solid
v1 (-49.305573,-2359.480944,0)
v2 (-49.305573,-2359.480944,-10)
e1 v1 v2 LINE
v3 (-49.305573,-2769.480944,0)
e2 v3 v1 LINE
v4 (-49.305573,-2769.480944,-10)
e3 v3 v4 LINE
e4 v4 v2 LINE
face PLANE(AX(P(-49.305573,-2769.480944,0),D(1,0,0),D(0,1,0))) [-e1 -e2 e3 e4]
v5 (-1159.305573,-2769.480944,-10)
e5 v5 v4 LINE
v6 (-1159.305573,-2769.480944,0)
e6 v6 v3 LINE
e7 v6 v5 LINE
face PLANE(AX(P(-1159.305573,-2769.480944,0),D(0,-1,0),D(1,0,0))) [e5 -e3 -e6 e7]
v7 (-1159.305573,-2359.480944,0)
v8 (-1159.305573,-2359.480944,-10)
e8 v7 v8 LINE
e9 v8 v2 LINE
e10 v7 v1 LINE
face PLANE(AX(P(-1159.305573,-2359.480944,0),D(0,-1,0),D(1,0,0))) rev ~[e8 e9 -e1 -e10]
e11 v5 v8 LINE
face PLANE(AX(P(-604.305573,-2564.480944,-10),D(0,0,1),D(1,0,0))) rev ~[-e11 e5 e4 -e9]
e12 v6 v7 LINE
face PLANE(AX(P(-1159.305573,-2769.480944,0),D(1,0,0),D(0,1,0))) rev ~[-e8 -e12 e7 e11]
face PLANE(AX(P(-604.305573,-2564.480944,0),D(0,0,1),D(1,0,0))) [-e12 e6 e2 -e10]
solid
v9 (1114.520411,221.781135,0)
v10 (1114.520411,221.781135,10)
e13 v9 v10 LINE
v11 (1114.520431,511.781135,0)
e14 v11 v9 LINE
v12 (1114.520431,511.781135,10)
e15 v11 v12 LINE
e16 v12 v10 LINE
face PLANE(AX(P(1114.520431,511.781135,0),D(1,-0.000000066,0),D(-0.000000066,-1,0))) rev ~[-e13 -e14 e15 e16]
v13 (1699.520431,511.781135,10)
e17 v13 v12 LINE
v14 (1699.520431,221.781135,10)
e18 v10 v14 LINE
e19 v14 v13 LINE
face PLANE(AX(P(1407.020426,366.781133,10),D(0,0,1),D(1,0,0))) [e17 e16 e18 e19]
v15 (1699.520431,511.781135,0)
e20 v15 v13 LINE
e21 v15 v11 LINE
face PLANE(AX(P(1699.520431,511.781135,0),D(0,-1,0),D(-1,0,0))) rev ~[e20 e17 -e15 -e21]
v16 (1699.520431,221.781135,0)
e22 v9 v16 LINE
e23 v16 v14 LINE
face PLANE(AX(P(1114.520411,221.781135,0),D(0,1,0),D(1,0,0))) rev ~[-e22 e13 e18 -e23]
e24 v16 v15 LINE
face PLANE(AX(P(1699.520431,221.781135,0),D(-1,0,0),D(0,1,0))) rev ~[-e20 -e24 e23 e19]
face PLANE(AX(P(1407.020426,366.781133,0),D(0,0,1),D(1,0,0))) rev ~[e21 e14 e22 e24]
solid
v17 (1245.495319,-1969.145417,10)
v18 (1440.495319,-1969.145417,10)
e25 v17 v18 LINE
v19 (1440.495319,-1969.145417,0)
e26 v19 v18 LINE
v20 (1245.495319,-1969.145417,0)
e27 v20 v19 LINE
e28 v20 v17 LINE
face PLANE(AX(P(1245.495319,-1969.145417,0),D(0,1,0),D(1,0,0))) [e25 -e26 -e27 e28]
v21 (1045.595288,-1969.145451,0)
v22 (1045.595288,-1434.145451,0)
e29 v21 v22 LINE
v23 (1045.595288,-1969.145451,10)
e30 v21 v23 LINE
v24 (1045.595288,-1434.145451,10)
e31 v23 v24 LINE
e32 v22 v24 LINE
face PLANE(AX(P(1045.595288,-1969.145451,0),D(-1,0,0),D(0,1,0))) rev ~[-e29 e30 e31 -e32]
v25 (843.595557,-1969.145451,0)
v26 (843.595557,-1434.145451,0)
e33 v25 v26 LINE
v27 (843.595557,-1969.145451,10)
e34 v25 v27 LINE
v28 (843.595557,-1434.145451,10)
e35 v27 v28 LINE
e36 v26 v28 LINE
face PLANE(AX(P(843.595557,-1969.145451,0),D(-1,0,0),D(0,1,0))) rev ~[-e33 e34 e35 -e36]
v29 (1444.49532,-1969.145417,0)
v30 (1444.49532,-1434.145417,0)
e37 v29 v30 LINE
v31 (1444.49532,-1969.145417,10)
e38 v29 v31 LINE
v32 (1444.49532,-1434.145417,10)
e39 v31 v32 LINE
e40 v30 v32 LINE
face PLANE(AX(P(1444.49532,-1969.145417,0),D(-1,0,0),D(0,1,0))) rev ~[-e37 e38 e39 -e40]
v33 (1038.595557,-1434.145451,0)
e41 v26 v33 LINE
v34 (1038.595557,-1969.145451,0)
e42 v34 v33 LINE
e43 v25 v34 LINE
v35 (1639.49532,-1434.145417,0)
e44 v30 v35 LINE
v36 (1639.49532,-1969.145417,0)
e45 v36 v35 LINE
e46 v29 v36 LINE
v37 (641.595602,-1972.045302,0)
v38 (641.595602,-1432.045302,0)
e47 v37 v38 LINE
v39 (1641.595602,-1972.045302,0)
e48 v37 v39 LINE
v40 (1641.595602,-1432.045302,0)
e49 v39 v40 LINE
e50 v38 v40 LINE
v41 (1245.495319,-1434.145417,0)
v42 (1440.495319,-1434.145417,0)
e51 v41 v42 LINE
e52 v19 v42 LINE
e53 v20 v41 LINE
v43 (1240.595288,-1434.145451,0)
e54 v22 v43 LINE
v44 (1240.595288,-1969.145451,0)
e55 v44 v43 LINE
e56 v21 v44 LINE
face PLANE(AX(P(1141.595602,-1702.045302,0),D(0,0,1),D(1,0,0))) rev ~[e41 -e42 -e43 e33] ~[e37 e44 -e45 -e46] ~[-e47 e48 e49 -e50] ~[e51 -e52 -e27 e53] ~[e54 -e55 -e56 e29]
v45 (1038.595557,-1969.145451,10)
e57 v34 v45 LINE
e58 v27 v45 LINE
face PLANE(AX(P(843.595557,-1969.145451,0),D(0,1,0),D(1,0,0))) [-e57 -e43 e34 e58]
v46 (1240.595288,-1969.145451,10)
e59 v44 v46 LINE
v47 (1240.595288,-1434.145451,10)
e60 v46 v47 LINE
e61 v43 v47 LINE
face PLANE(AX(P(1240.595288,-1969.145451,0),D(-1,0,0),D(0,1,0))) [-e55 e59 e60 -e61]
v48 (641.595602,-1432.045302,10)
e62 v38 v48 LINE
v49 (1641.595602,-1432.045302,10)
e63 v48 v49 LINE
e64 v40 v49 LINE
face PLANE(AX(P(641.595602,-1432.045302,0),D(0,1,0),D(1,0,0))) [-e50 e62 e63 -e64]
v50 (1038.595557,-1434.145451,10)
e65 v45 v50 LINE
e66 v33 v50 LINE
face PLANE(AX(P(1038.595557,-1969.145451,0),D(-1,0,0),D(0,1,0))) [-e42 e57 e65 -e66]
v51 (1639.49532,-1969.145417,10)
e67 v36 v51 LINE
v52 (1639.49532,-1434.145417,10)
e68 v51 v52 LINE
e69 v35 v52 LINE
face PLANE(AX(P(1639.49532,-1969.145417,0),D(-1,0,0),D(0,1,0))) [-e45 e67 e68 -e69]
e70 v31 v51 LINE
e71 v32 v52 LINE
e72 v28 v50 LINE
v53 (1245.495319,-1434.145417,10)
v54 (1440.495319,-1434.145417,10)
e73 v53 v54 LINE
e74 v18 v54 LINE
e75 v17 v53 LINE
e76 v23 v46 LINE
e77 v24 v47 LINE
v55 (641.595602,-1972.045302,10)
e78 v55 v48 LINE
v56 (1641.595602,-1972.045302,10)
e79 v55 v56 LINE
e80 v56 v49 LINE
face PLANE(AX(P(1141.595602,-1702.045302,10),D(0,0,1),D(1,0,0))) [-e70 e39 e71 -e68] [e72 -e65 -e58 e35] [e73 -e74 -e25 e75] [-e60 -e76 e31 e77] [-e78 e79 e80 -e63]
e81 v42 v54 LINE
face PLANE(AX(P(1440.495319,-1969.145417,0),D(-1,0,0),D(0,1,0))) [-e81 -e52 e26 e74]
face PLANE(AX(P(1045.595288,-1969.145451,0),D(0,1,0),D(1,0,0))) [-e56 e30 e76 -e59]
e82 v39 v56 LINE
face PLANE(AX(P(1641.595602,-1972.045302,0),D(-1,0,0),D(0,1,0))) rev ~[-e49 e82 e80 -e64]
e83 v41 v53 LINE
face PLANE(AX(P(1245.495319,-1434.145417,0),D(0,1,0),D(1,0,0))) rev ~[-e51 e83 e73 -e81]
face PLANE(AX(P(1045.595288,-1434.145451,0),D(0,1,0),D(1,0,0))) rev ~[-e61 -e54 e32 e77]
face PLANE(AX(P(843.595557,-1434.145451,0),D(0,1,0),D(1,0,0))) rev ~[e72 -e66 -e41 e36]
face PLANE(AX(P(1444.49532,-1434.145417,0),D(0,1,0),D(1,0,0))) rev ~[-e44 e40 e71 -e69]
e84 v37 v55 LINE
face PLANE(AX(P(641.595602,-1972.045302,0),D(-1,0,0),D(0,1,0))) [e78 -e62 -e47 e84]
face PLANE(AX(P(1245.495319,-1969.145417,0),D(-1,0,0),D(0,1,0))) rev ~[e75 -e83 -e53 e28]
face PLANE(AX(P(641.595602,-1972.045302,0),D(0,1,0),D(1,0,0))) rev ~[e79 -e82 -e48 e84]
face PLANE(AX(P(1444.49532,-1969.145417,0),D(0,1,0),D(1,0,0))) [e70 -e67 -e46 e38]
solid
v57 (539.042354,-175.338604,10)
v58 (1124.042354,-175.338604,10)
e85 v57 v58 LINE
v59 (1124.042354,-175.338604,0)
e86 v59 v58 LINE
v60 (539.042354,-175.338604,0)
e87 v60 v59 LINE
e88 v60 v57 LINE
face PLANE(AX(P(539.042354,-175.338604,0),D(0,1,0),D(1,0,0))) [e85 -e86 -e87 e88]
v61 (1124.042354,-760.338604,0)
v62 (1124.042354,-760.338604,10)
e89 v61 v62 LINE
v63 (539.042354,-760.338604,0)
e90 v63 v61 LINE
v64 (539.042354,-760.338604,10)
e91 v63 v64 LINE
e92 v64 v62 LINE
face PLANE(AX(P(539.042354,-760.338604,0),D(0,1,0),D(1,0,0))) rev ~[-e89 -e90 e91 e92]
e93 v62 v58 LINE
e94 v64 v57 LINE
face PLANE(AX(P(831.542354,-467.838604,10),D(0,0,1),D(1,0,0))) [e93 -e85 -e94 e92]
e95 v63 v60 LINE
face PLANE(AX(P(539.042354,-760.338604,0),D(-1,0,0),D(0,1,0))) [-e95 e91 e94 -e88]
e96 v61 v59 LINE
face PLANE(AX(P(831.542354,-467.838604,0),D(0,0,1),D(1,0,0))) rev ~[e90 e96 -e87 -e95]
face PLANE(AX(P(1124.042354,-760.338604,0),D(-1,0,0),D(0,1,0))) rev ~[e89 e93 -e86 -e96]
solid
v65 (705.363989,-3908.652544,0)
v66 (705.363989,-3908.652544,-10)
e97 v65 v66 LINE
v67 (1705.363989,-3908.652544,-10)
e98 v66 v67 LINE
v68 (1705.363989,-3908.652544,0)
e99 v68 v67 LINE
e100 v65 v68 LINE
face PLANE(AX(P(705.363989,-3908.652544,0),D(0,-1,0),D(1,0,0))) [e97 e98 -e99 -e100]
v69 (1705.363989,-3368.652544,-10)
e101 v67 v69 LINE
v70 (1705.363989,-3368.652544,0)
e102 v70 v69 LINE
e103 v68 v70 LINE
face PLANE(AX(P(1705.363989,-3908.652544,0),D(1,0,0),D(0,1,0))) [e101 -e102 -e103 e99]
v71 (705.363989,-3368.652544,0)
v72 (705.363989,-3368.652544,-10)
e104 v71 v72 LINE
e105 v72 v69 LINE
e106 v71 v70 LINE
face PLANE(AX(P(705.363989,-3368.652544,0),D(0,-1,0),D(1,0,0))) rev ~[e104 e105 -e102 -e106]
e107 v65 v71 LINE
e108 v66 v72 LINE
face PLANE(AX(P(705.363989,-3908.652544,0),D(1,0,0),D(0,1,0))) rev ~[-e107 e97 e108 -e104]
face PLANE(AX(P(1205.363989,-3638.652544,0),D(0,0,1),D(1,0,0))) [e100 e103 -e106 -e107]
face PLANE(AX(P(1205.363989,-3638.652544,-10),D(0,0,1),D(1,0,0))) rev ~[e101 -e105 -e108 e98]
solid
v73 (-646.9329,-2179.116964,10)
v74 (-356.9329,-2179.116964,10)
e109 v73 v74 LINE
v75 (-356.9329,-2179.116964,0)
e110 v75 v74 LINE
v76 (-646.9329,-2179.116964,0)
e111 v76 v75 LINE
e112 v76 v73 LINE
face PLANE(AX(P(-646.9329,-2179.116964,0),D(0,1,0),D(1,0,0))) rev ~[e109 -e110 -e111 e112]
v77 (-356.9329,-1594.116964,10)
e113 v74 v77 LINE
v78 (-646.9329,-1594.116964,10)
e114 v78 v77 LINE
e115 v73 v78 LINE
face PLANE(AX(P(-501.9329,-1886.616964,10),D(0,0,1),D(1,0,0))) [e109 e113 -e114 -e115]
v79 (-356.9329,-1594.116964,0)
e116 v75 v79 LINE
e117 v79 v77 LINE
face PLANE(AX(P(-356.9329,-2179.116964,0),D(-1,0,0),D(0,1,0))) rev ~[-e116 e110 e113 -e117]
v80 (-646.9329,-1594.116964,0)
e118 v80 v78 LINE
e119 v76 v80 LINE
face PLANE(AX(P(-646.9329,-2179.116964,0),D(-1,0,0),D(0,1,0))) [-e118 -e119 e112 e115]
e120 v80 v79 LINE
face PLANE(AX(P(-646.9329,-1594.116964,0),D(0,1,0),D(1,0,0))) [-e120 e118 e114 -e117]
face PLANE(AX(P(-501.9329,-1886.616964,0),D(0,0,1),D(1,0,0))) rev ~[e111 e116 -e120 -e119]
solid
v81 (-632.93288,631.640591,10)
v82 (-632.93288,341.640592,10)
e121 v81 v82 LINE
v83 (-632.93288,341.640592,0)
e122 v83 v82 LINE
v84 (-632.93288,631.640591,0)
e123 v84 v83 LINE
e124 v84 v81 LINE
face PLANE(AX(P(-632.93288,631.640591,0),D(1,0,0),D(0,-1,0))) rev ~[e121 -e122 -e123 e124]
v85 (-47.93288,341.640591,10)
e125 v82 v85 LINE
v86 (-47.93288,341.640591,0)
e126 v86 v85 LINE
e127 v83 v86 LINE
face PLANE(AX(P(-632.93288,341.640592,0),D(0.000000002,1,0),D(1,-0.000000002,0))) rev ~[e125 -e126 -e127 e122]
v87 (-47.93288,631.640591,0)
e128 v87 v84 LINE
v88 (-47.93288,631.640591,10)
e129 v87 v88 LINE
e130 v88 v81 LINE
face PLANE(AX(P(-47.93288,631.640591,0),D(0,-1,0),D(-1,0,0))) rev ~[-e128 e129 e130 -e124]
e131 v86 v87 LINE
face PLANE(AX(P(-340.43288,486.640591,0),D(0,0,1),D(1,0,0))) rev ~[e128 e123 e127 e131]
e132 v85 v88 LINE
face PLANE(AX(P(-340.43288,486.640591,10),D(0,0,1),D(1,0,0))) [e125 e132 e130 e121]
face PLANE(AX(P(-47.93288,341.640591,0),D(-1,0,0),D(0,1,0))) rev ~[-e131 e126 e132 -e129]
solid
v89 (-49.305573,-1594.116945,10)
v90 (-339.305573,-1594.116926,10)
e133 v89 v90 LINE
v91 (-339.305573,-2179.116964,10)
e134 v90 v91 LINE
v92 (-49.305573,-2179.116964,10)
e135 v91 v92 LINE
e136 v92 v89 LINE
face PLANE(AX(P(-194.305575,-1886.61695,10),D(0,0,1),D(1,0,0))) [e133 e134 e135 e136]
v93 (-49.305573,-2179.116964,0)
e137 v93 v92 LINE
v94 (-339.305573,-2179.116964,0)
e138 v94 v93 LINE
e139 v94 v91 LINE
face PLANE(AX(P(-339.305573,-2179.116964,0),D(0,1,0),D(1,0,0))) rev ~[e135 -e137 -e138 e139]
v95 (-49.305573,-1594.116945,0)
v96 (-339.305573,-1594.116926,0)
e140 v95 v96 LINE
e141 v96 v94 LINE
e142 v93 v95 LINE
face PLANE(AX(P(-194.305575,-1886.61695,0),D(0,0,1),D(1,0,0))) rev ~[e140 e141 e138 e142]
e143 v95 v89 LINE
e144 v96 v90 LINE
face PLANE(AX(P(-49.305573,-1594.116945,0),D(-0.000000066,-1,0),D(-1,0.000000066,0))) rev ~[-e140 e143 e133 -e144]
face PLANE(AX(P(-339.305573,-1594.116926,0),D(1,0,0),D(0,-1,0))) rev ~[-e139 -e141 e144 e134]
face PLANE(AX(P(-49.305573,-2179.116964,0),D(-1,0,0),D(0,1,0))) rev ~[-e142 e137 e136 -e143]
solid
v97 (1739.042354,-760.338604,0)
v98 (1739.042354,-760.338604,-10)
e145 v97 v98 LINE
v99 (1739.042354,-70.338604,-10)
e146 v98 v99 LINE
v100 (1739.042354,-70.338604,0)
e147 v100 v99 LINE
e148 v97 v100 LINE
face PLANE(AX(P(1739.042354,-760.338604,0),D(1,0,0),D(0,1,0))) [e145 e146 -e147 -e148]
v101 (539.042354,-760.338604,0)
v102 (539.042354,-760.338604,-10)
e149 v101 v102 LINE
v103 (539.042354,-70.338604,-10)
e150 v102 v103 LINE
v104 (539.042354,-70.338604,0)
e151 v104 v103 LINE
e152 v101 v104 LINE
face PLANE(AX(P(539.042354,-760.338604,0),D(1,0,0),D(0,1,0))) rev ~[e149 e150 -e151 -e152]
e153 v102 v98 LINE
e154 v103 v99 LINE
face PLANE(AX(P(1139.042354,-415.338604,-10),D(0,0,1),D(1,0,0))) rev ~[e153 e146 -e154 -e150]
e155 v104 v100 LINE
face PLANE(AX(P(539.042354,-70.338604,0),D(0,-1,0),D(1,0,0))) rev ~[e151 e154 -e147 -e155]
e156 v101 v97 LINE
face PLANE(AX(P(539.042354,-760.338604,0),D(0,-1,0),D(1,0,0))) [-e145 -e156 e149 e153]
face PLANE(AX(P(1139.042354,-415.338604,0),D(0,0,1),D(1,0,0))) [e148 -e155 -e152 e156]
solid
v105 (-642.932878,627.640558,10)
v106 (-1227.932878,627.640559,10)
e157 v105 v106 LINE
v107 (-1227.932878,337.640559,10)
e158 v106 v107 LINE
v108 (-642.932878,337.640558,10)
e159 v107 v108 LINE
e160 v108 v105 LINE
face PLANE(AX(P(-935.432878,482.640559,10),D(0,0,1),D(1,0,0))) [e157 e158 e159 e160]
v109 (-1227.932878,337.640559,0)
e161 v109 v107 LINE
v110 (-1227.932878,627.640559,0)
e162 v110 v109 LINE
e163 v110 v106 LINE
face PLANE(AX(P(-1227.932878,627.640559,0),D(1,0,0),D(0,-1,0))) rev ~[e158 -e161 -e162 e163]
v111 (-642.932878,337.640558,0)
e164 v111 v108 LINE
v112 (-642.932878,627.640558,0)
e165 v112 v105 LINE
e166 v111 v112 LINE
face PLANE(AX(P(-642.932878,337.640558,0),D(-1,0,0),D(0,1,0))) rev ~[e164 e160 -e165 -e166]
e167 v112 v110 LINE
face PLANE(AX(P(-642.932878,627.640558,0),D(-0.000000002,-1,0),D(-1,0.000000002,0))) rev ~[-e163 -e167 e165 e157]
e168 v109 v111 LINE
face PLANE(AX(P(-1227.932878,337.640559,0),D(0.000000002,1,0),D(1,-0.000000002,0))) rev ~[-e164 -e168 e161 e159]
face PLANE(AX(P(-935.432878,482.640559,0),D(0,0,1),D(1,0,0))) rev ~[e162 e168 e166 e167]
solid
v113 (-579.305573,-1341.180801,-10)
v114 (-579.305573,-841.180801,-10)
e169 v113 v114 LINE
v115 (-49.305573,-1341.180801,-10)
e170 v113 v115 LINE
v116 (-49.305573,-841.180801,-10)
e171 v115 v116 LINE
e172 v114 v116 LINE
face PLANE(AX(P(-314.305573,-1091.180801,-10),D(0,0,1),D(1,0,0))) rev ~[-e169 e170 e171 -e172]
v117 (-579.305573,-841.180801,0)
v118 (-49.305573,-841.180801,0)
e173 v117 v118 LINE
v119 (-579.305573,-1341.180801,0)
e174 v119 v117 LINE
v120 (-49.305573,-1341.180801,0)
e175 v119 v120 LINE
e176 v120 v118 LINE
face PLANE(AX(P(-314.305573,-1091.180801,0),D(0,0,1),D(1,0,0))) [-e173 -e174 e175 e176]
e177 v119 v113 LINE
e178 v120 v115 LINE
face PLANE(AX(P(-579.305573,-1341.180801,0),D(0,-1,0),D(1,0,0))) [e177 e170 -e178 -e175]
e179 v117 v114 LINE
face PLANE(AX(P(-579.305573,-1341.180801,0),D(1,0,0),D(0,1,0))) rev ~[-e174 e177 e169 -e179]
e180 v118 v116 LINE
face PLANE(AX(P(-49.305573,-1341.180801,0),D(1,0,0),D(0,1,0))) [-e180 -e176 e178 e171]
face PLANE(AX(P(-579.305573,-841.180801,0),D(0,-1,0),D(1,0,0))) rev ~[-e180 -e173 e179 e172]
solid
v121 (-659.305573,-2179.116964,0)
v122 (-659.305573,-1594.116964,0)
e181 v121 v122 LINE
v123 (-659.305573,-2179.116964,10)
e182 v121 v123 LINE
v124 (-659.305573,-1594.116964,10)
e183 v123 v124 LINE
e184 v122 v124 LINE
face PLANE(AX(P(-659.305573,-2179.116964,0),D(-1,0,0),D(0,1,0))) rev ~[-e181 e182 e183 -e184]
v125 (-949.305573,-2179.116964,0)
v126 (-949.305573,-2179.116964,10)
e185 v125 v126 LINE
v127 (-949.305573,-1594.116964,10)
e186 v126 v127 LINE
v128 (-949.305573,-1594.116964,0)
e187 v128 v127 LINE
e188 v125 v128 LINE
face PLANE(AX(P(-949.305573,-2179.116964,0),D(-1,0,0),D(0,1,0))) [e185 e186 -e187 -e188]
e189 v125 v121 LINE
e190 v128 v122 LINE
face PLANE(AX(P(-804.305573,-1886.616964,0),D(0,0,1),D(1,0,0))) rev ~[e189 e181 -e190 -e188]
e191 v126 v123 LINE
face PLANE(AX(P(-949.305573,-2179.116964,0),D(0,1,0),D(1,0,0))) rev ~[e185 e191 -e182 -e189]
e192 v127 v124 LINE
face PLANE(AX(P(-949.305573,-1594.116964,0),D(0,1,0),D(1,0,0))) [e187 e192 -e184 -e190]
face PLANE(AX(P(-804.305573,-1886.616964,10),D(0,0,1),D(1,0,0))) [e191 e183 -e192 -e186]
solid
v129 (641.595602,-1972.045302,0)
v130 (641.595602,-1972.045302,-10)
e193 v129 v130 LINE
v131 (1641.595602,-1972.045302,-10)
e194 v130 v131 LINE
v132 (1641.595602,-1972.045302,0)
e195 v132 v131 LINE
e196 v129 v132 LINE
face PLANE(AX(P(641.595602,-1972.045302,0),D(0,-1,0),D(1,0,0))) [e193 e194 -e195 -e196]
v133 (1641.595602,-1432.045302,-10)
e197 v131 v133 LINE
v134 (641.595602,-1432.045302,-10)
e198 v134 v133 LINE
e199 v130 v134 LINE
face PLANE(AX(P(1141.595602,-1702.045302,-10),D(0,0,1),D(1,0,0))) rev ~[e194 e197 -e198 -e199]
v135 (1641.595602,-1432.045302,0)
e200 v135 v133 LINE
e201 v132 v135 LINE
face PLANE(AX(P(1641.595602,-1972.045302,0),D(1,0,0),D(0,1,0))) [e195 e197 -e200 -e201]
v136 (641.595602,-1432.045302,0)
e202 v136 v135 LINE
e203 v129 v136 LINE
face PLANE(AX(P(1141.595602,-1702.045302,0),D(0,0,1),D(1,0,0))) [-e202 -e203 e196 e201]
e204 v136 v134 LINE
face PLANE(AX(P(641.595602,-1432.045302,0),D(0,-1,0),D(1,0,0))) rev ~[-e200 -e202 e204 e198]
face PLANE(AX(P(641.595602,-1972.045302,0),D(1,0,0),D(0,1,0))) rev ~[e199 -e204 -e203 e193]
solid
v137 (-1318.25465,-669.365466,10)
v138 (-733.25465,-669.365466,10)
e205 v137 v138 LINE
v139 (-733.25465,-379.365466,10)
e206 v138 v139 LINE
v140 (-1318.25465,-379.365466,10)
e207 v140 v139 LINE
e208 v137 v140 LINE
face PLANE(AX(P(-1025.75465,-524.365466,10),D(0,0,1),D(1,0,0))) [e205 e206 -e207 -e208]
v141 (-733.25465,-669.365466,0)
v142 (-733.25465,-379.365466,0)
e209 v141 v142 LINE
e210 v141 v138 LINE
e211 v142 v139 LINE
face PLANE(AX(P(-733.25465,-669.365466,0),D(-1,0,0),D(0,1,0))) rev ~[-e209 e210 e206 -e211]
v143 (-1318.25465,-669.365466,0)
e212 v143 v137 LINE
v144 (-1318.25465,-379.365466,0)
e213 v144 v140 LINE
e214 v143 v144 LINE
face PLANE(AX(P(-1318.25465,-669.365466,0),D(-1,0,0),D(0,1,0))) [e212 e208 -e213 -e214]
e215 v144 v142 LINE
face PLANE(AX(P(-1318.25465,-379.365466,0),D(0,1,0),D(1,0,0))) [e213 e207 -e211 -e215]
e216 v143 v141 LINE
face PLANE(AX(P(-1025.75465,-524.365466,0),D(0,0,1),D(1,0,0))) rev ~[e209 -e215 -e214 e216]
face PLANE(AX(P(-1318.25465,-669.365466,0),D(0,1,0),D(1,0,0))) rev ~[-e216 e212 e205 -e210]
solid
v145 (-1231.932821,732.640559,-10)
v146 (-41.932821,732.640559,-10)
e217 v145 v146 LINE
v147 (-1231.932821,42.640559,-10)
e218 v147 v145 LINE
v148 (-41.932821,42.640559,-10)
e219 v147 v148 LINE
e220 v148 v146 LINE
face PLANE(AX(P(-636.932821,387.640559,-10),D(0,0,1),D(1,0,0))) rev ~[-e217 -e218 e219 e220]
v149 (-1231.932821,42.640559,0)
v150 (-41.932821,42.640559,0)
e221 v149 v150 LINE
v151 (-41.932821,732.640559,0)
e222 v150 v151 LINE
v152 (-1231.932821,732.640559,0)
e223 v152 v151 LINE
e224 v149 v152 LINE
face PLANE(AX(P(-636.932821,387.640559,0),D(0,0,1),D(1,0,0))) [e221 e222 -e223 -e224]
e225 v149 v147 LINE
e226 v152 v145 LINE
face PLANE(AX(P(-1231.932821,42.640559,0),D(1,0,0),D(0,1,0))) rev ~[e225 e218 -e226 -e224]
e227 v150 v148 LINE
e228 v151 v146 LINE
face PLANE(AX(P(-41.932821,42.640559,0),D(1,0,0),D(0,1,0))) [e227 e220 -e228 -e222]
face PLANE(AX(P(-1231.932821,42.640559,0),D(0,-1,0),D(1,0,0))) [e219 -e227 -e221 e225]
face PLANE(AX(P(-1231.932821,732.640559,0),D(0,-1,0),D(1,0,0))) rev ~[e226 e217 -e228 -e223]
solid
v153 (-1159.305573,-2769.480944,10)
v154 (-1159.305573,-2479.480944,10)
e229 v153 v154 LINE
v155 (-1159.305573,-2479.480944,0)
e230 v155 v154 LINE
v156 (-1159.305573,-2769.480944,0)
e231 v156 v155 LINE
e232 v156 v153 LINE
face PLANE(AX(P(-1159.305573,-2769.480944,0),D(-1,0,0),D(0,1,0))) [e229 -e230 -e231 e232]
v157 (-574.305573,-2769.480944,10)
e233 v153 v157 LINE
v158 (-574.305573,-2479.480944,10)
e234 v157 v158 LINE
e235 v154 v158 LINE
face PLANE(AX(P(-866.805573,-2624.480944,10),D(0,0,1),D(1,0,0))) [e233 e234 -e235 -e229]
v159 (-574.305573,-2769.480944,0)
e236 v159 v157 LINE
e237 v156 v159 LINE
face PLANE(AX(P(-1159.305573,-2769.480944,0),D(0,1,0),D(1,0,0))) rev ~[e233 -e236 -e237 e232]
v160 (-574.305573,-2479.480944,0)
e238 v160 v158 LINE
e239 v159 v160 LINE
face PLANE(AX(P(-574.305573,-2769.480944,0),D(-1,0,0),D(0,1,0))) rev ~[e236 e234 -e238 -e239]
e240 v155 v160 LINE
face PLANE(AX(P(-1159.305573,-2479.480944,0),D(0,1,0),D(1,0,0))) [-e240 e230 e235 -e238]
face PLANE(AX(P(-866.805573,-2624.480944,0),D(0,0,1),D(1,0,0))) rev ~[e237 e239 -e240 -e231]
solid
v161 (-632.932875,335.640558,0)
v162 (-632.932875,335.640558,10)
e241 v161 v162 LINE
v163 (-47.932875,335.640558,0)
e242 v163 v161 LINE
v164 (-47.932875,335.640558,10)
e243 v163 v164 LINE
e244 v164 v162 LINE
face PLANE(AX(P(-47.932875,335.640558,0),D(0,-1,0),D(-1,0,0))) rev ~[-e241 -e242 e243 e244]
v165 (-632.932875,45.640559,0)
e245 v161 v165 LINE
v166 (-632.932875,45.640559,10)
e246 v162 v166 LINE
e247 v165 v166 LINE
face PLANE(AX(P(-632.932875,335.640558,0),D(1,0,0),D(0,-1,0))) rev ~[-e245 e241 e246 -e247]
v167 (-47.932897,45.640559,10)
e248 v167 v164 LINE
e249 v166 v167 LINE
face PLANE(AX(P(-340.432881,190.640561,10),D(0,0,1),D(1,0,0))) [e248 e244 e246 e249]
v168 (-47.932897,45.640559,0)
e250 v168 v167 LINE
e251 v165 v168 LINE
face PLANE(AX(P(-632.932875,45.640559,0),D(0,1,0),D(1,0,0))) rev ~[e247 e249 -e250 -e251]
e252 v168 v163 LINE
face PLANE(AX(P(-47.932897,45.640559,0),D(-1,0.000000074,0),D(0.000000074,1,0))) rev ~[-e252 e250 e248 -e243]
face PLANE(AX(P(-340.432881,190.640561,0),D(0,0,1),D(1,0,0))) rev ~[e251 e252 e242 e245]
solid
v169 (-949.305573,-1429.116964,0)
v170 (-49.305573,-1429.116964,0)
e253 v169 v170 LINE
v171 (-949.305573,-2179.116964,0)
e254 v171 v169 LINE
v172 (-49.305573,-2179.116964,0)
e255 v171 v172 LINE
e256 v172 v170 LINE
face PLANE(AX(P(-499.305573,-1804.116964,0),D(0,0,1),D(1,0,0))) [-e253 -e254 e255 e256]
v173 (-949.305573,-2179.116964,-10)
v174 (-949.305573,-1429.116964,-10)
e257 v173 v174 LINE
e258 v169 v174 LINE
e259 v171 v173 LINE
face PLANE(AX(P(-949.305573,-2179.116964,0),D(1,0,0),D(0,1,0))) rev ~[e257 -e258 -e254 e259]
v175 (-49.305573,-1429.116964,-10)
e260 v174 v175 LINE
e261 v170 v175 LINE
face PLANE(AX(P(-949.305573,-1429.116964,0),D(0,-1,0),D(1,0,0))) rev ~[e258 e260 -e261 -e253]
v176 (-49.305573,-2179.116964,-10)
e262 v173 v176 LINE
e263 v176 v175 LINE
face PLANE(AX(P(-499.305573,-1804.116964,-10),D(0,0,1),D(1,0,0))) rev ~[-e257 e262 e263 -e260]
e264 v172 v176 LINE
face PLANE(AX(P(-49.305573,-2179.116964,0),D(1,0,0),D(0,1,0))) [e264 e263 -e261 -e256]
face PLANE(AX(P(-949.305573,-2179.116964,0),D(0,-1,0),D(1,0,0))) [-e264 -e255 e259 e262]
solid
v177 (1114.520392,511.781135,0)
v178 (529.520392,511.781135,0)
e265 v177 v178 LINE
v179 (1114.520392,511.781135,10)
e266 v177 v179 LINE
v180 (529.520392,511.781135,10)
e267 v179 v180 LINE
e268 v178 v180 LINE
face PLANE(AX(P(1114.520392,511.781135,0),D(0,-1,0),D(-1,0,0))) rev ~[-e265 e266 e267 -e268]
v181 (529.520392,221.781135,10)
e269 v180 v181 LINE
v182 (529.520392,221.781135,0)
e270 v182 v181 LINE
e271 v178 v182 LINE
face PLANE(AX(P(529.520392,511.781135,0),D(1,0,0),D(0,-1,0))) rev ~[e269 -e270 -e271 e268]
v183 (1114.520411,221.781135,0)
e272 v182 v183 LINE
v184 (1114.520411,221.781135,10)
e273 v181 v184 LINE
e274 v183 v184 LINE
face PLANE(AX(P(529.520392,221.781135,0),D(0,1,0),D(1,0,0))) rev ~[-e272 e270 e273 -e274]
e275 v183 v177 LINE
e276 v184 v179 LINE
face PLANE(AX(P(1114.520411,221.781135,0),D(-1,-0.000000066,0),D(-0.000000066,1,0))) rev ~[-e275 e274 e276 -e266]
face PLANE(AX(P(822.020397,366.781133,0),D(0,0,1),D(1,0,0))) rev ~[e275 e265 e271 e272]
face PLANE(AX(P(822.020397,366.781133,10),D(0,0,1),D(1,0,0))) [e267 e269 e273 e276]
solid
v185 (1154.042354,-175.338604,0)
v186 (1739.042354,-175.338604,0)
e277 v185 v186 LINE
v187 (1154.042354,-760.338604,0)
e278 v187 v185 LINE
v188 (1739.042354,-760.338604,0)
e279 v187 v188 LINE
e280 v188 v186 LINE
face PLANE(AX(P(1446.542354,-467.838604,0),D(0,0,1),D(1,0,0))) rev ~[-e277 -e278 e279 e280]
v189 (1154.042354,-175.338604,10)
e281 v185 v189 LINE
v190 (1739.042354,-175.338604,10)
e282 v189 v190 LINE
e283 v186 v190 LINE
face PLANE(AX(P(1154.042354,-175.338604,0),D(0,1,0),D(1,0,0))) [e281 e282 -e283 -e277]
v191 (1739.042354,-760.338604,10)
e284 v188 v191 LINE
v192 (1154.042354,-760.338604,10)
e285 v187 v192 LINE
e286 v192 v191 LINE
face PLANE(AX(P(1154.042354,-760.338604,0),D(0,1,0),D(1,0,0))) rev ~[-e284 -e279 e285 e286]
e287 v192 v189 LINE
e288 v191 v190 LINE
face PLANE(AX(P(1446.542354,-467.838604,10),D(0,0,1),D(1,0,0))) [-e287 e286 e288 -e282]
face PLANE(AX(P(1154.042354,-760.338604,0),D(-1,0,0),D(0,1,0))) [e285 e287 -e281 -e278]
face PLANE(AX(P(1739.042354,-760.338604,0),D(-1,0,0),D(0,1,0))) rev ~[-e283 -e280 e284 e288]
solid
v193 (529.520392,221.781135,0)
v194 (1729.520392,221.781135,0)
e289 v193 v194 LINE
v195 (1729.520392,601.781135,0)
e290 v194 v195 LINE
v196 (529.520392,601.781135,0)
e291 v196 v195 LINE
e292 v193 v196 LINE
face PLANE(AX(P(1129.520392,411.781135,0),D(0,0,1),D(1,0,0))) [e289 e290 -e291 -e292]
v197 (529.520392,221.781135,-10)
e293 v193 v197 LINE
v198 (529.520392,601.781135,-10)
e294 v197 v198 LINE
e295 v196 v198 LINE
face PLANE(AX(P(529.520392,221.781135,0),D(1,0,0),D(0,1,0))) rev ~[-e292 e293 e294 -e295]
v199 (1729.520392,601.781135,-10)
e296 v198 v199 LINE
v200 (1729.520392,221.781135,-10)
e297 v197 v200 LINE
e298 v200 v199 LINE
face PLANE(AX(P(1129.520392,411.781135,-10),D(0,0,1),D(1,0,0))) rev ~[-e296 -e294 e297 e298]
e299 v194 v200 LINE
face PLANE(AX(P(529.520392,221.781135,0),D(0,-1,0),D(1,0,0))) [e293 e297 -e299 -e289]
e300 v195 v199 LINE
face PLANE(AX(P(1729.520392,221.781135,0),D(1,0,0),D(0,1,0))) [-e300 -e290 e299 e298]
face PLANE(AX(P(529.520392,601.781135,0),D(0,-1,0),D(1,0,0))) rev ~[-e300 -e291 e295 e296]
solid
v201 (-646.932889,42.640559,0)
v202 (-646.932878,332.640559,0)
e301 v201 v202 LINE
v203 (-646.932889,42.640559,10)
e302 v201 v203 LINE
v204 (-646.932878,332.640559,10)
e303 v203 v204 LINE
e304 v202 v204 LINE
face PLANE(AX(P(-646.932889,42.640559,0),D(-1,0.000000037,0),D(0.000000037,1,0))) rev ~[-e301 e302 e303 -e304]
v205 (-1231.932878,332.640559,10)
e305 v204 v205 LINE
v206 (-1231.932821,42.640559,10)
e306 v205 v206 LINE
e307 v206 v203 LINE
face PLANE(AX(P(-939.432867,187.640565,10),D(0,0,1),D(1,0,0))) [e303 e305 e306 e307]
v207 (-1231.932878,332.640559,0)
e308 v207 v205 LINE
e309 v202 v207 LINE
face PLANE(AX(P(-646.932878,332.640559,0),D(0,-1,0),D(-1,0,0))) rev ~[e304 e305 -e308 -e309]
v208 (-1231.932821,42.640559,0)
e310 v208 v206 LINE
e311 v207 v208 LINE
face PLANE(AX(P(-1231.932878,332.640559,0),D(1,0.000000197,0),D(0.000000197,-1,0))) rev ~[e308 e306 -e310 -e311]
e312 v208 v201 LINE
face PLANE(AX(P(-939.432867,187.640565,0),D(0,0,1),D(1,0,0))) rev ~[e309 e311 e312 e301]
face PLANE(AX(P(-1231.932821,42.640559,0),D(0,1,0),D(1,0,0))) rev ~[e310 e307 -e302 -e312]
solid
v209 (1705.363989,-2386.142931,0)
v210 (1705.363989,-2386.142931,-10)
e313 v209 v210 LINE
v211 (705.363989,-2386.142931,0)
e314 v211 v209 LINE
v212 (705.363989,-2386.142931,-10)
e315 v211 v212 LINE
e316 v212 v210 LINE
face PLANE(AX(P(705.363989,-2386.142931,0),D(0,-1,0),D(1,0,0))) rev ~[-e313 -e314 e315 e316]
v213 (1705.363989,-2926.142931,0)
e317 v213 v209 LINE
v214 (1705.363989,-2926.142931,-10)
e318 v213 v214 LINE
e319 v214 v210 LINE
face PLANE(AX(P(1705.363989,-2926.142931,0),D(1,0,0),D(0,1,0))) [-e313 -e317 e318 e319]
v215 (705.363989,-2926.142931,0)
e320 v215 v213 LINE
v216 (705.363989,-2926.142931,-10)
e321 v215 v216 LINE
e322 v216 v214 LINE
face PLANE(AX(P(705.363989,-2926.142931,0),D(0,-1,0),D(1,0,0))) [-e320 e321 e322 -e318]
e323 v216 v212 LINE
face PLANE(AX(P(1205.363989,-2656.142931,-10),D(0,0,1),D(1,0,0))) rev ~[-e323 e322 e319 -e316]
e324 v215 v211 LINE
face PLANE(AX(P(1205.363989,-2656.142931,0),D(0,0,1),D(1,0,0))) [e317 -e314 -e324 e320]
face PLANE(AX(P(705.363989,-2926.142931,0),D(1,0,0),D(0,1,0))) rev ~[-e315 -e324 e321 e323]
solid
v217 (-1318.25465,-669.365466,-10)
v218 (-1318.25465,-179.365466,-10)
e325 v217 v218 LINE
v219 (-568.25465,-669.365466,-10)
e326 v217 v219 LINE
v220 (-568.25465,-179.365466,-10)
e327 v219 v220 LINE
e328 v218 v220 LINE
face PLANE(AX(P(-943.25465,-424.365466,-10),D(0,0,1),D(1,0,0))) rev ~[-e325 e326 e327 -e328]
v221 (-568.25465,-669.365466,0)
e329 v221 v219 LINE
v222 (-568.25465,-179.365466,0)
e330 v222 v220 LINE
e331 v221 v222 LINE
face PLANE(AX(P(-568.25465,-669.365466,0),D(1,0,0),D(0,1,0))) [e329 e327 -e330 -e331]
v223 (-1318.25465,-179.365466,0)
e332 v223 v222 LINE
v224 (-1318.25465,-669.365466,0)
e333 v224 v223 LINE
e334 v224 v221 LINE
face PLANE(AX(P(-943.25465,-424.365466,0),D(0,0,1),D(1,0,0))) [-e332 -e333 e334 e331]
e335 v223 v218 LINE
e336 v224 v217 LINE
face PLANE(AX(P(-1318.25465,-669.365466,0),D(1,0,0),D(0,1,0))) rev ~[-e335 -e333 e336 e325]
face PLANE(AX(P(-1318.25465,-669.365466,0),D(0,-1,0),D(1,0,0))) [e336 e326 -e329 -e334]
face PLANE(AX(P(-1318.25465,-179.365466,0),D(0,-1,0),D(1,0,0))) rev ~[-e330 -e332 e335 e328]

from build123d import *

# Parameters (mm, degrees)
F0_W     = 1190
F0_H     = 690
F2_DEPTH = 10
F0_W_2   = 750
F0_H_2   = 490
F0_W_3   = 530
F0_H_3   = 500
F0_W_4   = 900
F0_H_4   = 750
F0_W_5   = 1110
F0_H_5   = 410
F0_W_6   = 1200
F0_H_6   = 380
F0_W_7   = 1000
F0_H_7   = 540
F3_DEPTH = 10
F1_W     = 290
F1_H     = 585
F1_W_2   = 585
F1_H_2   = 290
F1_W_3   = 1000
F1_H_3   = 540
F1_W_4   = 195
F1_H_4   = 535


# Not quite as in the source:
# - ends of sketch curves that miss each other by under 0.0002 mm in the source are joined


with BuildPart() as f2:
    # F0 (on Top) → F2 (new body)
    with BuildSketch(Plane.XY):
        with Locations((-636.9328212738, 387.6405593753)):
            Rectangle(F0_W, F0_H)
    extrude(amount=-F2_DEPTH)


with BuildPart() as f2b:
    # F0 (on Top) → F2, piece 2 (new body)
    with BuildSketch(Plane.XY):
        with Locations((-943.2546496391, -424.365465641)):
            Rectangle(F0_W_2, F0_H_2)
    extrude(amount=-F2_DEPTH)


with BuildPart() as f2c:
    # F0 (on Top) → F2, piece 3 (new body)
    with BuildSketch(Plane.XY):
        with Locations((-314.3055731058, -1091.1808013916)):
            Rectangle(F0_W_3, F0_H_3)
    extrude(amount=-F2_DEPTH)


with BuildPart() as f2d:
    # F0 (on Top) → F2, piece 4 (new body)
    with BuildSketch(Plane.XY):
        with Locations((-499.3055731058, -1804.1169643402)):
            Rectangle(F0_W_4, F0_H_4)
    extrude(amount=-F2_DEPTH)


with BuildPart() as f2e:
    # F0 (on Top) → F2, piece 5 (new body)
    with BuildSketch(Plane.XY):
        with Locations((-604.3055731058, -2564.4809436798)):
            Rectangle(F0_W_5, F0_H_5)
    extrude(amount=-F2_DEPTH)


with BuildPart() as f2f:
    # F0 (on Top) → F2, piece 6 (new body)
    with BuildSketch(Plane.XY):
        with Locations((1129.5203924179, 411.7811346054)):
            Rectangle(F0_W_6, F0_H_6)
    extrude(amount=-F2_DEPTH)


with BuildPart() as f2g:
    # F0 (on Top) → F2, piece 7 (new body)
    with BuildSketch(Plane.XY):
        with Locations((1139.0423536301, -415.3386044502)):
            Rectangle(F0_W_6, F0_H)
    extrude(amount=-F2_DEPTH)


with BuildPart() as f2h:
    # F0 (on Top) → F2, piece 8 (new body)
    with BuildSketch(Plane.XY):
        with Locations((1141.5956020355, -1702.0453023911)):
            Rectangle(F0_W_7, F0_H_7)
    extrude(amount=-F2_DEPTH)


with BuildPart() as f2i:
    # F0 (on Top) → F2, piece 9 (new body)
    with BuildSketch(Plane.XY):
        with Locations((1205.3639888763, -2656.1429309845)):
            Rectangle(F0_W_7, F0_H_7)
    extrude(amount=-F2_DEPTH)


with BuildPart() as f2j:
    # F0 (on Top) → F2, piece 10 (new body)
    with BuildSketch(Plane.XY):
        with Locations((1205.3639888763, -3638.6525440216)):
            Rectangle(F0_W_7, F0_H_7)
    extrude(amount=-F2_DEPTH)


with BuildPart() as f3:
    # F1 (on Top) → F3 (new body)
    with BuildSketch(Plane.XY):
        Polygon((-642.9328784943, 337.6405584812), (-642.9328784943, 627.6405584812), (-1227.9328784943, 627.6405593753), (-1227.9328784943, 337.6405593753), align=None)
    extrude(amount=F3_DEPTH)


with BuildPart() as f3b:
    # F1 (on Top) → F3, piece 2 (new body)
    with BuildSketch(Plane.XY):
        Polygon((-47.9328799248, 341.6405907273), (-47.9328799248, 631.6405907273), (-632.9328799248, 631.6405907273), (-632.9328799248, 341.6405916214), align=None)
    extrude(amount=F3_DEPTH)


with BuildPart() as f3c:
    # F1 (on Top) → F3, piece 3 (new body)
    with BuildSketch(Plane.XY):
        Polygon((-646.9328784943, 332.6405593753), (-1231.9328784943, 332.6405593753), (-1231.9328212738, 42.6405593753), (-646.9328892231, 42.6405593753), align=None)
    extrude(amount=F3_DEPTH)


with BuildPart() as f3d:
    # F1 (on Top) → F3, piece 4 (new body)
    with BuildSketch(Plane.XY):
        Polygon((-47.9328751564, 335.6405584812), (-632.9328751564, 335.6405584812), (-632.9328751564, 45.6405593753), (-47.9328966141, 45.6405593753), align=None)
    extrude(amount=F3_DEPTH)


with BuildPart() as f3e:
    # F1 (on Top) → F3, piece 5 (new body)
    with BuildSketch(Plane.XY):
        with Locations((-804.3055731058, -1886.6169643402)):
            Rectangle(F1_W, F1_H)
    extrude(amount=F3_DEPTH)


with BuildPart() as f3f:
    # F1 (on Top) → F3, piece 6 (new body)
    with BuildSketch(Plane.XY):
        with Locations((-501.9328999519, -1886.6169643402)):
            Rectangle(F1_W, F1_H)
    extrude(amount=F3_DEPTH)


with BuildPart() as f3g:
    # F1 (on Top) → F3, piece 7 (new body)
    with BuildSketch(Plane.XY):
        Polygon((-49.3055731058, -2179.1169643402), (-49.3055731058, -1594.1169452667), (-339.3055731058, -1594.1169261932), (-339.3055731058, -2179.1169643402), align=None)
    extrude(amount=F3_DEPTH)


with BuildPart() as f3h:
    # F1 (on Top) → F3, piece 8 (new body)
    with BuildSketch(Plane.XY):
        with Locations((-866.8055731058, -2624.4809436798)):
            Rectangle(F1_W_2, F1_H_2)
    extrude(amount=F3_DEPTH)


with BuildPart() as f3i:
    # F1 (on Top) → F3, piece 9 (new body)
    with BuildSketch(Plane.XY):
        Polygon((1114.5203924179, 511.7811346054), (529.5203924179, 511.7811346054), (529.5203924179, 221.7811346054), (1114.5204114914, 221.7811346054), align=None)
    extrude(amount=F3_DEPTH)


with BuildPart() as f3j:
    # F1 (on Top) → F3, piece 10 (new body)
    with BuildSketch(Plane.XY):
        Polygon((1114.5204114914, 221.7811346054), (1699.5204305649, 221.7811346054), (1699.5204305649, 511.7811346054), (1114.5204305649, 511.7811346054), align=None)
    extrude(amount=F3_DEPTH)


with BuildPart() as f3k:
    # F1 (on Top) → F3, piece 11 (new body)
    with BuildSketch(Plane.XY):
        with Locations((831.5423536301, -467.8386044502)):
            Rectangle(F1_W_2, F1_H)
    extrude(amount=F3_DEPTH)


with BuildPart() as f3l:
    # F1 (on Top) → F3, piece 12 (new body)
    with BuildSketch(Plane.XY):
        with Locations((1446.5423536301, -467.8386044502)):
            Rectangle(F1_W_2, F1_H)
    extrude(amount=F3_DEPTH)


with BuildPart() as f3m:
    # F1 (on Top) → F3, piece 13 (new body)
    with BuildSketch(Plane.XY):
        with Locations((1141.5956020355, -1702.0453023911)):
            Rectangle(F1_W_3, F1_H_3)
        with Locations((941.0955572128, -1701.645450592)):
            Rectangle(F1_W_4, F1_H_4, mode=Mode.SUBTRACT)
        with Locations((1143.0952882767, -1701.645450592)):
            Rectangle(F1_W_4, F1_H_4, mode=Mode.SUBTRACT)
        with Locations((1342.9953193665, -1701.6454172134)):
            Rectangle(F1_W_4, F1_H_4, mode=Mode.SUBTRACT)
        with Locations((1541.9953203201, -1701.6454172134)):
            Rectangle(F1_W_4, F1_H_4, mode=Mode.SUBTRACT)
    extrude(amount=F3_DEPTH)


with BuildPart() as f3n:
    # F1 (on Top) → F3, piece 14 (new body)
    with BuildSketch(Plane.XY):
        with Locations((-1025.7546496391, -524.365465641)):
            Rectangle(F1_W_2, F1_H_2)
    extrude(amount=F3_DEPTH)


solid = Compound([f2.part, f2b.part, f2c.part, f2d.part, f2e.part, f2f.part, f2g.part, f2h.part, f2i.part, f2j.part, f3.part, f3b.part, f3c.part, f3d.part, f3e.part, f3f.part, f3g.part, f3h.part, f3i.part, f3j.part, f3k.part, f3l.part, f3m.part, f3n.part])
